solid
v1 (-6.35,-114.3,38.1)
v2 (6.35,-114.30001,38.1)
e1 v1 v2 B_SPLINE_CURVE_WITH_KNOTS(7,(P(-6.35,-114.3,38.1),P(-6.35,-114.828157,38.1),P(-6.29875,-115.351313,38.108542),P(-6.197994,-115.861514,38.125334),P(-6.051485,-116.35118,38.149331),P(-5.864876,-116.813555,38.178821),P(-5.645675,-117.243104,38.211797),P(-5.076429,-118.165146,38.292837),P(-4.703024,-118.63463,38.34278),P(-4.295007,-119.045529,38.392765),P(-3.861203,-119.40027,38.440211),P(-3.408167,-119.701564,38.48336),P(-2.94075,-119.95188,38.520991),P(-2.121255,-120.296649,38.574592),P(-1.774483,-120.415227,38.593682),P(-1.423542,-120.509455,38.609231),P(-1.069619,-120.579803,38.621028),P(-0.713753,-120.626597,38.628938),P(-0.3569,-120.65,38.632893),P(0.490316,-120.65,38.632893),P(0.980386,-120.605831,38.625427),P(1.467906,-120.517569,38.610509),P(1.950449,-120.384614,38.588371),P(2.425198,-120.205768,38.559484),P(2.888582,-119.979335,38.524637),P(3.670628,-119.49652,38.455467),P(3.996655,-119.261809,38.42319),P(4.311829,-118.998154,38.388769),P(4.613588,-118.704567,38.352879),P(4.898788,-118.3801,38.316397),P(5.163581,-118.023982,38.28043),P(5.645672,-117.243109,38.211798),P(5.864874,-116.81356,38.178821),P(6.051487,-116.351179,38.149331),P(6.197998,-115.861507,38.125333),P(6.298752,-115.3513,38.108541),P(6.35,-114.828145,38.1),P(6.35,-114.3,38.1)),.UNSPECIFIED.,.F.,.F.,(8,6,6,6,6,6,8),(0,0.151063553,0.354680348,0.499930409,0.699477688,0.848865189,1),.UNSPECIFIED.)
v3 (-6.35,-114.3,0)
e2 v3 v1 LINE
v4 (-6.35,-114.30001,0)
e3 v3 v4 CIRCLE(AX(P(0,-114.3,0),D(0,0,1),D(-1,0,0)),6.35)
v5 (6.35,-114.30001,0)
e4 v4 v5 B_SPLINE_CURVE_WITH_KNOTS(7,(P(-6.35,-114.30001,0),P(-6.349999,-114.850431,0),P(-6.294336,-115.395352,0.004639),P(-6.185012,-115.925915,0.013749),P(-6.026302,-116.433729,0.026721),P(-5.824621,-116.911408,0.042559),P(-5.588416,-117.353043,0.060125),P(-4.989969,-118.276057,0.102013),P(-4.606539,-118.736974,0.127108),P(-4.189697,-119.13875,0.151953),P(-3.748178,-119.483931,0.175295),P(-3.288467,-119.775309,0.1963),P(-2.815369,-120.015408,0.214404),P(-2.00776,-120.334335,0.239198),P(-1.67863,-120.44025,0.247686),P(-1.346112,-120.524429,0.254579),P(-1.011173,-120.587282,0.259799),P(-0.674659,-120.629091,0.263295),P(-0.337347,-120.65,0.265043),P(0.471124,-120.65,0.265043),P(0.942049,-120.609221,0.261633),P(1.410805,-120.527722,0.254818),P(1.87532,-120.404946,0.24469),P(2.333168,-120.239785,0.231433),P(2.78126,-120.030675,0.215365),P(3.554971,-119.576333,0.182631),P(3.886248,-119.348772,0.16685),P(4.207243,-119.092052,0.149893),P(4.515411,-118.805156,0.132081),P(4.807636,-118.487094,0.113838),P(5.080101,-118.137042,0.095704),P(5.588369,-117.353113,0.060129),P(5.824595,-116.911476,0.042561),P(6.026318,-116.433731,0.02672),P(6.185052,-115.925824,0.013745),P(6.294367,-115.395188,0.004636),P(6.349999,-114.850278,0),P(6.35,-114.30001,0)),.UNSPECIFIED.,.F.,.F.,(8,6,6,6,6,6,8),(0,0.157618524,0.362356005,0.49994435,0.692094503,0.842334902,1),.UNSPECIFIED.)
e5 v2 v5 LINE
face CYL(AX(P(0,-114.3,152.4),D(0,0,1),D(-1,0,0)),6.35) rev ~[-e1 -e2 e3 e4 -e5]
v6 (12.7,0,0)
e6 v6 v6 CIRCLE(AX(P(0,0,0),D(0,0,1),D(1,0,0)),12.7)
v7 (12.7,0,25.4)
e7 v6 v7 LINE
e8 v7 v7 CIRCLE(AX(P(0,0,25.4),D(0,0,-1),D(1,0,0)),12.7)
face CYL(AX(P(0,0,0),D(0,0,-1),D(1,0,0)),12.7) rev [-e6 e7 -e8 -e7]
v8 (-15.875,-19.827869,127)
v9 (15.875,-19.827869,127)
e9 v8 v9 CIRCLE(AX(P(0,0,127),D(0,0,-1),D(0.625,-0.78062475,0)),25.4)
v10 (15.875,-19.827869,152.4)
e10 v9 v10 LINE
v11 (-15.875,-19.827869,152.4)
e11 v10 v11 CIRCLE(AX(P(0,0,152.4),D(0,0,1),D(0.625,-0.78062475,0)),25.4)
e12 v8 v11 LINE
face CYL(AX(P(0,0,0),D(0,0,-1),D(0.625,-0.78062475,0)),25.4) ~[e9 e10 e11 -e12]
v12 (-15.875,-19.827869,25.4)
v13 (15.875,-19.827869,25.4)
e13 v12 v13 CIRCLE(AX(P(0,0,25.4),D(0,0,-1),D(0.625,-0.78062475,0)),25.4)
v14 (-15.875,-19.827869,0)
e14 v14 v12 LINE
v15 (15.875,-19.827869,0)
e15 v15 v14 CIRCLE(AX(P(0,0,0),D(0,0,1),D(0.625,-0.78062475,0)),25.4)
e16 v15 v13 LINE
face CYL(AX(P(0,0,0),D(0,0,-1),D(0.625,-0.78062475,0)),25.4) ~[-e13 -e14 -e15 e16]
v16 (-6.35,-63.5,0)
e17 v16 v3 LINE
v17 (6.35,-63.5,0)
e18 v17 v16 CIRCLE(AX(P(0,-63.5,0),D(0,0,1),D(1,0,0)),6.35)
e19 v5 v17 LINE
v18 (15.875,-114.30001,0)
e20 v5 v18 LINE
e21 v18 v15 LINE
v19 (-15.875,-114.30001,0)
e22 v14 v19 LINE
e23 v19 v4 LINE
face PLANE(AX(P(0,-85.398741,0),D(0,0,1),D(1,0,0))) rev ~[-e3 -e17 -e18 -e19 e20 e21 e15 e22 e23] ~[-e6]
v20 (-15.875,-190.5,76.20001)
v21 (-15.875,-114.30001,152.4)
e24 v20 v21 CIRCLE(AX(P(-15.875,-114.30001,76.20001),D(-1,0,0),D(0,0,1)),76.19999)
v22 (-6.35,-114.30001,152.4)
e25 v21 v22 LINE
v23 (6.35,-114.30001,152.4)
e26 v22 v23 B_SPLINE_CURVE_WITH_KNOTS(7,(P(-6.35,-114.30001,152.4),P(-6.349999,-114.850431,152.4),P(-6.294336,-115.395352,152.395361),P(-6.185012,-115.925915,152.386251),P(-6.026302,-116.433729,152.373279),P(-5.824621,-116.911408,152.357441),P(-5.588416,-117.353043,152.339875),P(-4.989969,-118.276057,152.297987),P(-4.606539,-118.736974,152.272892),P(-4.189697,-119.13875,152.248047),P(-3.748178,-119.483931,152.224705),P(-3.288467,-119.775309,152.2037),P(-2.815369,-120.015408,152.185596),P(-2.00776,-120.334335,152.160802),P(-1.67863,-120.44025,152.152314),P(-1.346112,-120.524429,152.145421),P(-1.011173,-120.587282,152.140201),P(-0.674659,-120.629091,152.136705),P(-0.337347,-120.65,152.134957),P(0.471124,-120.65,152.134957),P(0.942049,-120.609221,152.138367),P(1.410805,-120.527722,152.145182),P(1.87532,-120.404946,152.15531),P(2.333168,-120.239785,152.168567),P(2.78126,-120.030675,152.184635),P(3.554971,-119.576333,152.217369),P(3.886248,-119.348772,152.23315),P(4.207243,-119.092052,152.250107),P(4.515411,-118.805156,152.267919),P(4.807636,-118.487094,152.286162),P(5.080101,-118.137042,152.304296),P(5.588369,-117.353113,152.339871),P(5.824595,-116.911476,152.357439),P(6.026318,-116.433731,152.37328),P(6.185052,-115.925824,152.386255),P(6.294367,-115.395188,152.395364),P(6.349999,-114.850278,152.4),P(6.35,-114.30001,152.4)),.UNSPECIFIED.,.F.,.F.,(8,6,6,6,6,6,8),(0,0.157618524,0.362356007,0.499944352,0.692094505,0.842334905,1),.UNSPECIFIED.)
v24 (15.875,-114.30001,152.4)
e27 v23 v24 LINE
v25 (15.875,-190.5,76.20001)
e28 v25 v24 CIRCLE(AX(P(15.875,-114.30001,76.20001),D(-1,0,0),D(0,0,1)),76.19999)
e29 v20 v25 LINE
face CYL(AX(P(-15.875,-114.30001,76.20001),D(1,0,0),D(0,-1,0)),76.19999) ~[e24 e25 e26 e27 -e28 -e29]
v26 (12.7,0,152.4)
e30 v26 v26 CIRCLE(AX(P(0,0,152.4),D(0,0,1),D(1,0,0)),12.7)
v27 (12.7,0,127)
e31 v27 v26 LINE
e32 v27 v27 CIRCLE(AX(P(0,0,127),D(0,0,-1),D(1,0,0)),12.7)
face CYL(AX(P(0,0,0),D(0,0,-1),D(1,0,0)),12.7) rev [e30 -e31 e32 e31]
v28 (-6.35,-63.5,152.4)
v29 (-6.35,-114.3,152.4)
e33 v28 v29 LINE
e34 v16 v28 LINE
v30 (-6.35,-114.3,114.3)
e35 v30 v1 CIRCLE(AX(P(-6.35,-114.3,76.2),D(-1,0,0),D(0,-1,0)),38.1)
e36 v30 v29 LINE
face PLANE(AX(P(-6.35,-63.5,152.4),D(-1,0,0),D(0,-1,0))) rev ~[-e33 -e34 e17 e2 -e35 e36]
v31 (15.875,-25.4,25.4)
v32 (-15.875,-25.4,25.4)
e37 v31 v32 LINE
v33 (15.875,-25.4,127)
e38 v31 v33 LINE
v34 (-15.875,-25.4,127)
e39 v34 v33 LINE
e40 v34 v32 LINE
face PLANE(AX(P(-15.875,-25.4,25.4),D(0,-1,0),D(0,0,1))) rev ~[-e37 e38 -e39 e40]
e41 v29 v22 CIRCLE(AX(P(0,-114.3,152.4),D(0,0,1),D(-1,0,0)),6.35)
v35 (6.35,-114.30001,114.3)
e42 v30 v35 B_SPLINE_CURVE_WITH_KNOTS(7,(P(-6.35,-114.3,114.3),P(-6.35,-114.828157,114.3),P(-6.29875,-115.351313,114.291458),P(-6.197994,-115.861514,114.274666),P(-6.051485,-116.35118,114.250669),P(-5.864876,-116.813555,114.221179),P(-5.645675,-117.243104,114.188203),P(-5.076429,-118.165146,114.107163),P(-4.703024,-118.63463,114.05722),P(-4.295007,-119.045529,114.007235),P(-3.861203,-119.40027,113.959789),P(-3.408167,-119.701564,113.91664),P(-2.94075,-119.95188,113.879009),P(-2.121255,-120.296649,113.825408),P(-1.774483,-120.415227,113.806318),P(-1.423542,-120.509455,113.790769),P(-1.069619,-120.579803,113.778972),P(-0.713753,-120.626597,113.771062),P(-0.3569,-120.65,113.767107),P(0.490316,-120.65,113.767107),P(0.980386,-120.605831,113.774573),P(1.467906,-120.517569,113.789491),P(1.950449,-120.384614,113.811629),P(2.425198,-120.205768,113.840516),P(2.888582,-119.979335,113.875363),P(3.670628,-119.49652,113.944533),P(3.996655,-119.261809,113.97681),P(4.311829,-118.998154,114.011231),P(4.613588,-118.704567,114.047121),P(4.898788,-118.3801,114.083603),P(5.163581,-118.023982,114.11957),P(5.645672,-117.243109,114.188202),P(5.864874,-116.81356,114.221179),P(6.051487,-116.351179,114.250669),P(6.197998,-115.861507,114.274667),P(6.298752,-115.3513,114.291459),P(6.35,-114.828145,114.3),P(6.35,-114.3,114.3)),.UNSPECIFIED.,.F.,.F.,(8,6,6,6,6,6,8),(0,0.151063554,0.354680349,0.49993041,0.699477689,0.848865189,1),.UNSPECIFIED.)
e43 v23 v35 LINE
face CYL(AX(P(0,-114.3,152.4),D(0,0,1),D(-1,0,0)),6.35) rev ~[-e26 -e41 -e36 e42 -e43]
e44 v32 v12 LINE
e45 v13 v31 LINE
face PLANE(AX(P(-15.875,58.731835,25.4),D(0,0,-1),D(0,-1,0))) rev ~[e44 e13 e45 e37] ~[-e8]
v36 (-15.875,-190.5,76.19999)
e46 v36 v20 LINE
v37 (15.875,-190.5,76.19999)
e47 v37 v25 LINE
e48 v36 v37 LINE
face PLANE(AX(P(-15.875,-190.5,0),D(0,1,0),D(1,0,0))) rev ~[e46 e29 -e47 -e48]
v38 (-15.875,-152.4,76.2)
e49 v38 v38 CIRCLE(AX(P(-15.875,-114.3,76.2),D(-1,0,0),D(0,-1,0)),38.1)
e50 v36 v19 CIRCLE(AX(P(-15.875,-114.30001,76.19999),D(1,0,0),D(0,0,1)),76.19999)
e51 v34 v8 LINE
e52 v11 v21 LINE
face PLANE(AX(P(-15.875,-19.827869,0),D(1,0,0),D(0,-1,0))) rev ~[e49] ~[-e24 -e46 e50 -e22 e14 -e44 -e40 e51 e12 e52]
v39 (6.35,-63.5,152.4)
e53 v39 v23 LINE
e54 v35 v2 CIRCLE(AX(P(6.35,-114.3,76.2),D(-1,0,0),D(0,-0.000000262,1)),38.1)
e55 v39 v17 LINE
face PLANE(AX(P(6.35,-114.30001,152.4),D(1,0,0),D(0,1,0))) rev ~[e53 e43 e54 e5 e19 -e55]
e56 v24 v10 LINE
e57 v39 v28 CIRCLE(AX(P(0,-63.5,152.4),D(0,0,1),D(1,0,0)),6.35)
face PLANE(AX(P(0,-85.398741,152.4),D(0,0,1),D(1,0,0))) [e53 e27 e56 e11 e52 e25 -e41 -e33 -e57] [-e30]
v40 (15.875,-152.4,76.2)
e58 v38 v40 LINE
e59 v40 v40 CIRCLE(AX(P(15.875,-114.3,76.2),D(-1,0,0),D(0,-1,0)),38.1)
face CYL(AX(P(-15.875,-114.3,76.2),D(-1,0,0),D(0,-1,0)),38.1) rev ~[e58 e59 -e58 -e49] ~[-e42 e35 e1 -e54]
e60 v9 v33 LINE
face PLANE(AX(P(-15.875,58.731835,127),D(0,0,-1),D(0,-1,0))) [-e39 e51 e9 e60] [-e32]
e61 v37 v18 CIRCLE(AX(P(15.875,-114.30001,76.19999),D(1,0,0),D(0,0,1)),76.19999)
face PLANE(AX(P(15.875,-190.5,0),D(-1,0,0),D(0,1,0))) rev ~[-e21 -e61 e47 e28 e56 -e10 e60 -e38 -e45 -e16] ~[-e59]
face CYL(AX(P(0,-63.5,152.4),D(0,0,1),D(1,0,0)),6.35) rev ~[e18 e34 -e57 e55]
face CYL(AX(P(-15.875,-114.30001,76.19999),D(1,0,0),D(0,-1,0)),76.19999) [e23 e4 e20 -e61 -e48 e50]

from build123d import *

# Parameters (mm, degrees)
F0_R     = 12.7
F1_DEPTH = 152.4
F2_R     = 76.19999
F3_R     = 38.1
F3_W     = 84.1318353355
F3_H     = 101.6
F4_DEPTH = 6350
F6_DEPTH = 241.62033
F5_R     = 12.7
F7_DEPTH = 170.20256


# Not quite as in the source:
# - a fillet or chamfer is up to 0.001 mm smaller than in the source, because OpenCascade refuses the exact size
# - ends of sketch curves that miss each other by under 0.0002 mm in the source are joined


with BuildPart() as f1:
    # F0 (on Top) → F1 (new body)
    with BuildSketch(Plane.XY):
        with BuildLine():
            Line((15.875, -190.5), (15.875, -19.8278686449))
            ThreePointArc((15.875, -19.8278686449), (0, 25.4), (-15.875, -19.8278686449))
            Line((-15.875, -19.8278686449), (-15.875, -190.5))
            Line((-15.875, -190.5), (15.875, -190.5))
        make_face()
        Circle(F0_R, mode=Mode.SUBTRACT)
    extrude(amount=F1_DEPTH)

    # F2 (radius 76.2 in the source; OpenCascade refuses exactly that, so slightly less here)
    f2_edges = [f1.edges().sort_by_distance(p)[0] for p in [
        (0, -190.5, 152.4),
        (0, -190.5, 0),
    ]]
    fillet(f2_edges, radius=F2_R)

    # F3 (on face) → F4 (cut, symmetric)
    with BuildSketch(Plane(origin=(-15.875, 0, 0), x_dir=(0, -1, 0), z_dir=(-1, 0, 0))):
        with Locations((114.3, 76.2)):
            Circle(F3_R)
        with Locations((-16.6659176677, 76.2)):
            Rectangle(F3_W, F3_H)
    extrude(amount=F4_DEPTH, both=True, mode=Mode.SUBTRACT)

    # F5 (on face) → F6 (cut, symmetric)
    with BuildSketch(Plane.XY.offset(152.4)):
        with BuildLine():
            ThreePointArc((6.35, -63.5), (0, -57.15), (-6.35, -63.5))
            Line((-6.35, -63.5), (-6.35, -114.3))
            Line((-6.35, -114.3), (6.35, -114.30001))
            Line((6.35, -114.30001), (6.35, -63.5))
        make_face()
    extrude(amount=F6_DEPTH, both=True, mode=Mode.SUBTRACT)

    # F5 (on face) → F7 (cut)
    with BuildSketch(Plane.XY.offset(152.4)):
        Circle(F5_R)
        with BuildLine():
            ThreePointArc((6.35, -63.5), (0, -57.15), (-6.35, -63.5))
            Line((-6.35, -63.5), (-6.35, -114.3))
            ThreePointArc((-6.35, -114.3), (0, -120.65), (6.35, -114.3))
            Line((6.35, -114.3), (6.35, -63.5))
        make_face()
    extrude(amount=-F7_DEPTH, mode=Mode.SUBTRACT)


solid = f1.part
